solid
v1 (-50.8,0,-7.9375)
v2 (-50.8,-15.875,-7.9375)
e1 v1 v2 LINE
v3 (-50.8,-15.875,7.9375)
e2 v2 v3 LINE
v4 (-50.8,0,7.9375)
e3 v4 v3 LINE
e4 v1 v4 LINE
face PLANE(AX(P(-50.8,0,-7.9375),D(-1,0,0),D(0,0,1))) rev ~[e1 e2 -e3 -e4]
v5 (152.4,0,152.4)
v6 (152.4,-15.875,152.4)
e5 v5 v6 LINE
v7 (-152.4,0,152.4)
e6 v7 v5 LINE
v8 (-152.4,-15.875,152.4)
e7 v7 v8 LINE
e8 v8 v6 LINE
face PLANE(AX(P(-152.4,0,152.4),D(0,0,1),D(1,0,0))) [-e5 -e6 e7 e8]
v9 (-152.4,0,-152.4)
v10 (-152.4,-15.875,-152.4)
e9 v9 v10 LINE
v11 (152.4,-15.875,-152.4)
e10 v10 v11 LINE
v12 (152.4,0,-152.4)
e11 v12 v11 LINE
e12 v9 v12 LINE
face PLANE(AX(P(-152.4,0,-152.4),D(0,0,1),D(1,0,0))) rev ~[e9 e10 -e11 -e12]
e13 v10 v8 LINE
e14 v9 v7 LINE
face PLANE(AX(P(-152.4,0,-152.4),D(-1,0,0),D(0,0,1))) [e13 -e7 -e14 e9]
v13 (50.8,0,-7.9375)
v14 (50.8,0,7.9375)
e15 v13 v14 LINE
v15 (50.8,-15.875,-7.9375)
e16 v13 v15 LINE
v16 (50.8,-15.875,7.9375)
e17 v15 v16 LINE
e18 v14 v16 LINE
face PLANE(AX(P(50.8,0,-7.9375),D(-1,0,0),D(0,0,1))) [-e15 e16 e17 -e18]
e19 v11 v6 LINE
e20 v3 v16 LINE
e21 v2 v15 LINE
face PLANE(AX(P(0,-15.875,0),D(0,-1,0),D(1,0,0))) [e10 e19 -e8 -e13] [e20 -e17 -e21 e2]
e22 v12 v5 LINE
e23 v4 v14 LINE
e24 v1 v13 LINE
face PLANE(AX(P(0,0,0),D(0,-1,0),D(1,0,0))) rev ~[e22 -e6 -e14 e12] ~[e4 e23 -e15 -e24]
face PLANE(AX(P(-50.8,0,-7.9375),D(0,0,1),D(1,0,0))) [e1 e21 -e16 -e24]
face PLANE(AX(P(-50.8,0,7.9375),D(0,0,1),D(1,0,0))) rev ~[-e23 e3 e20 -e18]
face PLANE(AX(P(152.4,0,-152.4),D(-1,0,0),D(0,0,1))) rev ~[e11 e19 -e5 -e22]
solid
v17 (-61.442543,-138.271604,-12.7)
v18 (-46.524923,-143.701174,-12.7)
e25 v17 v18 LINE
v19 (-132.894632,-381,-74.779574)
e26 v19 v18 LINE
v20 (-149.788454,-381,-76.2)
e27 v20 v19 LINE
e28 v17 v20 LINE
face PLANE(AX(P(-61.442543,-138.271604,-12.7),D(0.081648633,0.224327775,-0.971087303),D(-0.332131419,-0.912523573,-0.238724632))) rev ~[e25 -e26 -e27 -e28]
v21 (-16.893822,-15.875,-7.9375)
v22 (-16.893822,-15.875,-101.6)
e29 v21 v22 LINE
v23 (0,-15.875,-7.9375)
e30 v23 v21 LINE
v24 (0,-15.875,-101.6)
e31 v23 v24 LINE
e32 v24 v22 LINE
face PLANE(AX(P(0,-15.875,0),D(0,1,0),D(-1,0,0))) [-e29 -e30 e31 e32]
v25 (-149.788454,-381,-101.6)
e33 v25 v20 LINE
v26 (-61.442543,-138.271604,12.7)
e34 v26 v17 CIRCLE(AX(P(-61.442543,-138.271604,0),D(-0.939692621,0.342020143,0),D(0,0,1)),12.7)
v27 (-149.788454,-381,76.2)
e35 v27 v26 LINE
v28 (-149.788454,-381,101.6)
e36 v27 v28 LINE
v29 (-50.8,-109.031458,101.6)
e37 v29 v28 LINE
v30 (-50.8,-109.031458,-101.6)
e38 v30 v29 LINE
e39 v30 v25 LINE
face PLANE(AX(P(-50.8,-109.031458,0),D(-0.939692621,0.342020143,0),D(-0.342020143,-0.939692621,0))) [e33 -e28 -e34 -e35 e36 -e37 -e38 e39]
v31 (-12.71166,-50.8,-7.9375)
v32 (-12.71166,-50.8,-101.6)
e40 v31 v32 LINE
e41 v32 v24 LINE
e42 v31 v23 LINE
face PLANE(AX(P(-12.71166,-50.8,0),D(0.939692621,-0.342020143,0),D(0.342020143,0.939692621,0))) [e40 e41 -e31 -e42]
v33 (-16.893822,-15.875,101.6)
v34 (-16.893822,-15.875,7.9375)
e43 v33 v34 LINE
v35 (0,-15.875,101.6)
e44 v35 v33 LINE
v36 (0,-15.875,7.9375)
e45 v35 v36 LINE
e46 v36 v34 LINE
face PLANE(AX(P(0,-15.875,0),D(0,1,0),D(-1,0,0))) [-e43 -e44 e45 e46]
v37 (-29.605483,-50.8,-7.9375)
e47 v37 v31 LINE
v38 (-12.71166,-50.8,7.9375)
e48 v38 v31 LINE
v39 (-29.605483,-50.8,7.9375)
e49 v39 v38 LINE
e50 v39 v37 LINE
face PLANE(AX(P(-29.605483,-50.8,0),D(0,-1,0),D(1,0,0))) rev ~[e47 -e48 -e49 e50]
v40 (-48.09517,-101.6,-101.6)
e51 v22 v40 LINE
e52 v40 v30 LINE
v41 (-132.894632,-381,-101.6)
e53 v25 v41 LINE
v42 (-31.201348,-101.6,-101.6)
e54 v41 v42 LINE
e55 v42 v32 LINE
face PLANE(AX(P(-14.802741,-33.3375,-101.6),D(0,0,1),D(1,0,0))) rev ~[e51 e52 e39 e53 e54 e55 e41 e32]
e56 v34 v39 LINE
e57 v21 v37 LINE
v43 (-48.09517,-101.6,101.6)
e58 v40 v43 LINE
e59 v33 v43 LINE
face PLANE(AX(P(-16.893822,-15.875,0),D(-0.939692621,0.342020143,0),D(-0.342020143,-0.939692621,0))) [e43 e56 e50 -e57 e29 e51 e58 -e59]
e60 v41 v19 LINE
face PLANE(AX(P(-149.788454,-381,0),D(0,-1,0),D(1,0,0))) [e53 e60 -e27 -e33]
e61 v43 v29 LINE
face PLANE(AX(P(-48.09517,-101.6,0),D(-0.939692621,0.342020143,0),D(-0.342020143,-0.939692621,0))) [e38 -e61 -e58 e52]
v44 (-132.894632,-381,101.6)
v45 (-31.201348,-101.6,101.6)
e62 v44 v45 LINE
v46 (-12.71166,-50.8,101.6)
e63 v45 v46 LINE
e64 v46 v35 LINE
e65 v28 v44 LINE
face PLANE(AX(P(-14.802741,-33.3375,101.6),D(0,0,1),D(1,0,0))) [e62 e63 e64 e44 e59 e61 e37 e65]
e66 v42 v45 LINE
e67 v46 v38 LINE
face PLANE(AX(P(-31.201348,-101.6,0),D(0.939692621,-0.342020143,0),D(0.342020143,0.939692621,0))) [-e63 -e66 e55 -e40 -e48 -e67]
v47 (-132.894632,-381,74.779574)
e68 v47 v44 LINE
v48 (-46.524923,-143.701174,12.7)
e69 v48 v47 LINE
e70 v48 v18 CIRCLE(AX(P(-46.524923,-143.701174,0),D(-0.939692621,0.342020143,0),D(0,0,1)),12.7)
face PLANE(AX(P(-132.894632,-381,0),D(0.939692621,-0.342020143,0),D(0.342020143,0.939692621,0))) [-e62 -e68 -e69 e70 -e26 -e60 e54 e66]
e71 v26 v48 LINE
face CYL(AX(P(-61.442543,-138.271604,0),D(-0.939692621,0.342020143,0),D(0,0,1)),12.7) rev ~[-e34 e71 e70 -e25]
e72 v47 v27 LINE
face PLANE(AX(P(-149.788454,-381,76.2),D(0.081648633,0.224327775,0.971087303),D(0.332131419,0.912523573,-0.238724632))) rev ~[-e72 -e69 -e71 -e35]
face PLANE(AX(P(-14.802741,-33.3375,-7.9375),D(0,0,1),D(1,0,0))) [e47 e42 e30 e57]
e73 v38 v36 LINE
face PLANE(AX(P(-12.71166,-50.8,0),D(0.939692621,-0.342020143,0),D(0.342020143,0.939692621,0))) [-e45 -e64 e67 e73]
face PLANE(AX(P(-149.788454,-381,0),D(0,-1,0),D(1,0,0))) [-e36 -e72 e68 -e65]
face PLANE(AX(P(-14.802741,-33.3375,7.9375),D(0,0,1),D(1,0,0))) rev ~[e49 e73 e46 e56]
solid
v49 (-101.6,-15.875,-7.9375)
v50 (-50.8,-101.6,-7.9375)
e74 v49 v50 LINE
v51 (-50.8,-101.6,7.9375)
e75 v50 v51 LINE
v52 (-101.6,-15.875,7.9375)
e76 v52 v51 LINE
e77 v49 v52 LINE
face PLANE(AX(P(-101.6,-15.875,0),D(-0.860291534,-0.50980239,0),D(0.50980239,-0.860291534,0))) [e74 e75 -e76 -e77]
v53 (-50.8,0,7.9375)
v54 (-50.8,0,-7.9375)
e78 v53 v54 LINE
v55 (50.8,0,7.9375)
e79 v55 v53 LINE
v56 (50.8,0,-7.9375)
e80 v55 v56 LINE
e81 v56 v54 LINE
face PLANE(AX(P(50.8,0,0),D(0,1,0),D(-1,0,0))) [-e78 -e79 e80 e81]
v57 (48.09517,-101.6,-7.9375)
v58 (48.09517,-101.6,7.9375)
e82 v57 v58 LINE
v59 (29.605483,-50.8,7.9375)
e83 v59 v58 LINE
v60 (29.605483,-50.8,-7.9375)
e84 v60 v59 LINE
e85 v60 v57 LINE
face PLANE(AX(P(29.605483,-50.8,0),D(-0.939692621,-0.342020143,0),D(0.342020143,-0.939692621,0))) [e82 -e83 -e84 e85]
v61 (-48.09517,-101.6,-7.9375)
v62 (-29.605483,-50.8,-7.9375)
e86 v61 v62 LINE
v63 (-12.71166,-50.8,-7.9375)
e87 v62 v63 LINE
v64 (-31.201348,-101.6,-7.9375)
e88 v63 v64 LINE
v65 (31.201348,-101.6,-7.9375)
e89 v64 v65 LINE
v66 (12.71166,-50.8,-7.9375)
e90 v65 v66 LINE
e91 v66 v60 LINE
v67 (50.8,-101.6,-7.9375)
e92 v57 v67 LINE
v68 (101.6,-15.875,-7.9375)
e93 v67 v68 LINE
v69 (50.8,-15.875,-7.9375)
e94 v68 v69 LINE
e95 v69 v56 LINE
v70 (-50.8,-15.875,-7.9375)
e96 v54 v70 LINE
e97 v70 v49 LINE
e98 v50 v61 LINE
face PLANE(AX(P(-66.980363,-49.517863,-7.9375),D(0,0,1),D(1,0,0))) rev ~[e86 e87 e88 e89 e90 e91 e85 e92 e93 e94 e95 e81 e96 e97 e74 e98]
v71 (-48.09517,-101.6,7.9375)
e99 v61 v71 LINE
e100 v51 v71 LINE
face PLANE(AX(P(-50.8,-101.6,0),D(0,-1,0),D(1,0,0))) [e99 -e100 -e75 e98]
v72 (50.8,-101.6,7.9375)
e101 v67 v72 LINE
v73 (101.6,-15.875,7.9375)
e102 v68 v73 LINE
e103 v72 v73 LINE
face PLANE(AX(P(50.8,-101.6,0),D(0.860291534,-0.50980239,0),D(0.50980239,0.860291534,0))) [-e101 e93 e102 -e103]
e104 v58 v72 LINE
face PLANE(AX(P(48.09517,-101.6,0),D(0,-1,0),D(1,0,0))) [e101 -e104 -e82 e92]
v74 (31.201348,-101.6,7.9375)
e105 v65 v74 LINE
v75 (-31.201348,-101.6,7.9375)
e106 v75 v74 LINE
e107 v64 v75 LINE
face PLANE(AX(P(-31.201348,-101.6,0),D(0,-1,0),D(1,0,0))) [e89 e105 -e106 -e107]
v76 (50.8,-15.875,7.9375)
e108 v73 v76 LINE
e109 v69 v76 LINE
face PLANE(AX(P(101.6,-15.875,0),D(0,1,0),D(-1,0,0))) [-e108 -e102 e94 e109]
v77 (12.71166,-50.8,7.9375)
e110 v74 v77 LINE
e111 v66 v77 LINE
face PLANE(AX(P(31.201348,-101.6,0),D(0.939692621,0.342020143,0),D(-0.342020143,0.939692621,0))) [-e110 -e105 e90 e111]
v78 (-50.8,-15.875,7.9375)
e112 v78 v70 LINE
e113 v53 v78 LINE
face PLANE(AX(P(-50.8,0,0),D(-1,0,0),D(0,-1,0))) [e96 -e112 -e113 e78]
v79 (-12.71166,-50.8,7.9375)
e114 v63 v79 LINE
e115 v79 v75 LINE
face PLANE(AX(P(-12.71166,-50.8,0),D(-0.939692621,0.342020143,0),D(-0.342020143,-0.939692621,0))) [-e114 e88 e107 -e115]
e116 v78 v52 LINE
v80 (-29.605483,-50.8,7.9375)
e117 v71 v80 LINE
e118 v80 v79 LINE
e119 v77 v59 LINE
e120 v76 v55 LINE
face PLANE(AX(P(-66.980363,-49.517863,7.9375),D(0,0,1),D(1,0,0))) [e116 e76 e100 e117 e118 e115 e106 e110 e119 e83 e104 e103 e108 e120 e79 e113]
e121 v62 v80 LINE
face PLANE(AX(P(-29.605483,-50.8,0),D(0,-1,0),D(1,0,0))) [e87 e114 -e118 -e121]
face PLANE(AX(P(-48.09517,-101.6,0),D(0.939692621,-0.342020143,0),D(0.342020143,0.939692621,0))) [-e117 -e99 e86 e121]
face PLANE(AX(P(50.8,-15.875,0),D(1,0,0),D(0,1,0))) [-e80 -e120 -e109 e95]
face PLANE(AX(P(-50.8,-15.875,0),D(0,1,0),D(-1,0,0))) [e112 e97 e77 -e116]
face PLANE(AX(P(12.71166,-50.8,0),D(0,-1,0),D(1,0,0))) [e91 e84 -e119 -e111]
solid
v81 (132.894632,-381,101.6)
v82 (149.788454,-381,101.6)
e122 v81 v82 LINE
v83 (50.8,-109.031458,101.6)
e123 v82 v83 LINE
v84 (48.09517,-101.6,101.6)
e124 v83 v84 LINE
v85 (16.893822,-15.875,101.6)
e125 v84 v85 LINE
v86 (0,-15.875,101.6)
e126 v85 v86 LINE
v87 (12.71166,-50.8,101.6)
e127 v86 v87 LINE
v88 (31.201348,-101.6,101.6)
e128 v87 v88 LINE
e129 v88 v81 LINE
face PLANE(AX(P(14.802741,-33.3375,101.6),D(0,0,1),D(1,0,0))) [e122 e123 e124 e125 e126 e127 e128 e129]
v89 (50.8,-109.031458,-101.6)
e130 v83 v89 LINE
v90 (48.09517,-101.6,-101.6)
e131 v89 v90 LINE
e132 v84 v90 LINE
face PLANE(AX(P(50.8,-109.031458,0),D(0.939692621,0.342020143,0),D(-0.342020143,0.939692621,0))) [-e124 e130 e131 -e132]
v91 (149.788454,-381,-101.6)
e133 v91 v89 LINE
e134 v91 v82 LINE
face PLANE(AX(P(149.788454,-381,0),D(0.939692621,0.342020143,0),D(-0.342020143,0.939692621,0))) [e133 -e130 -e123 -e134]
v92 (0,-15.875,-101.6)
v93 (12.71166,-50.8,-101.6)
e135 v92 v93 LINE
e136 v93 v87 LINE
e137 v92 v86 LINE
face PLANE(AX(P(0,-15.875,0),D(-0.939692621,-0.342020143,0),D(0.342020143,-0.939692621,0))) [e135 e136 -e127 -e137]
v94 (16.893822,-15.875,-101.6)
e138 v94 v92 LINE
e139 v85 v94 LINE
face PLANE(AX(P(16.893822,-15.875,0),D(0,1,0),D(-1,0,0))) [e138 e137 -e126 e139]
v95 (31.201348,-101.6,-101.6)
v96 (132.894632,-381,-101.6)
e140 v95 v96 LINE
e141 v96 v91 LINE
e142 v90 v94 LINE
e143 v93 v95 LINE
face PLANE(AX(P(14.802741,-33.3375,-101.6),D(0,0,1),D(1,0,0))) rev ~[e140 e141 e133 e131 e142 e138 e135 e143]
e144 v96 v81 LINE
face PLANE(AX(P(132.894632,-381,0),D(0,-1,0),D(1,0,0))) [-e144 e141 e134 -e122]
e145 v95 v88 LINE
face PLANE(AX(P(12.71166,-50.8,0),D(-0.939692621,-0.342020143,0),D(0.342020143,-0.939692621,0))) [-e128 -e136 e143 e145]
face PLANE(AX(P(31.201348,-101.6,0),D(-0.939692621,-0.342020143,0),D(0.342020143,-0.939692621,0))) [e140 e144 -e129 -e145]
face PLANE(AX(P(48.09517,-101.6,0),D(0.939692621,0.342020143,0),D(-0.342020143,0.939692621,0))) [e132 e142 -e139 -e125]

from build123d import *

# Parameters (mm, degrees)
F0_W          = 304.8
F0_H          = 304.8
F0_W_2        = 101.6
F0_H_2        = 15.875
F1_DEPTH      = 15.875
F3_DEPTH      = 7.9375
F3_DEPTH_BACK = 7.9375
F4_DEPTH      = 101.6
F4_DEPTH_BACK = 101.6
F5_DEPTH      = 7.9375
F5_DEPTH_BACK = 7.9375
F7_DEPTH      = 25.4


with BuildPart() as f1:
    # F0 (on Front) → F1 (new body)
    with BuildSketch(Plane.XZ):
        Rectangle(F0_W, F0_H)
        Rectangle(F0_W_2, F0_H_2, mode=Mode.SUBTRACT)
    extrude(amount=F1_DEPTH)


with BuildPart() as f3:
    # F2 (on Top) → F3 (new body, two sides)
    with BuildSketch(Plane.XY) as f3_sk:
        Polygon((-50.8, -50.8), (-50.8, -15.875), (-101.6, -15.875), (-50.8, -101.6), align=None)
        Polygon((50.8, 0), (-50.8, 0), (-50.8, -15.875), (-50.8, -50.8), (-29.6054825698, -50.8), (-16.8938221381, -15.875), (0, -15.875), (16.8938221381, -15.875), (29.6054825698, -50.8), (50.8, -50.8), (50.8, -15.875), align=None)
        Polygon((101.6, -15.875), (50.8, -15.875), (50.8, -50.8), (50.8, -101.6), align=None)
        Polygon((12.7116604317, -50.8), (-12.7116604317, -50.8), (-31.2013483325, -101.6), (31.2013483325, -101.6), align=None)
        Polygon((-16.8938221381, -15.875), (-29.6054825698, -50.8), (-12.7116604317, -50.8), (0, -15.875), align=None)
        Polygon((-29.6054825698, -50.8), (-50.8, -50.8), (-50.8, -101.6), (-48.0951704705, -101.6), align=None)
        Polygon((12.7116604317, -50.8), (29.6054825698, -50.8), (16.8938221381, -15.875), (0, -15.875), align=None)
        Polygon((50.8, -101.6), (50.8, -50.8), (29.6054825698, -50.8), (48.0951704705, -101.6), align=None)
        Polygon((0, -15.875), (-12.7116604317, -50.8), (12.7116604317, -50.8), align=None)
    extrude(amount=F3_DEPTH)
    extrude(f3_sk.sketch, amount=-F3_DEPTH_BACK)


with BuildPart() as f4:
    # F2 (on Top) → F4 (new body, two sides)
    with BuildSketch(Plane.XY) as f4_sk:
        Polygon((-16.8938221381, -15.875), (-29.6054825698, -50.8), (-12.7116604317, -50.8), (0, -15.875), align=None)
        Polygon((-31.2013483325, -101.6), (-48.0951704705, -101.6), (-50.8, -109.0314580557), (-149.7884539245, -381), (-132.8946317864, -381), align=None)
        Polygon((-12.7116604317, -50.8), (-29.6054825698, -50.8), (-48.0951704705, -101.6), (-31.2013483325, -101.6), align=None)
    extrude(amount=F4_DEPTH)
    extrude(f4_sk.sketch, amount=-F4_DEPTH_BACK)

    # F2 (on Top) → F5 (cut, two sides)
    with BuildSketch(Plane.XY) as f5_sk:
        Polygon((-16.8938221381, -15.875), (-29.6054825698, -50.8), (-12.7116604317, -50.8), (0, -15.875), align=None)
        Polygon((12.7116604317, -50.8), (29.6054825698, -50.8), (16.8938221381, -15.875), (0, -15.875), align=None)
    extrude(amount=F5_DEPTH, mode=Mode.SUBTRACT)
    extrude(f5_sk.sketch, amount=-F5_DEPTH_BACK, mode=Mode.SUBTRACT)

    # F6 (on face) → F7 (cut)
    with BuildSketch(Plane(origin=(-9.8154937031, 3.5725475426, 0), x_dir=(-0.3420201433, -0.9396926208, 0), z_dir=(-0.9396926208, 0.3420201433, 0))):
        with BuildLine():
            ThreePointArc((150.9473935528, 12.7), (159.9276496739, 8.9802561211), (163.6473935528, 0))
            ThreePointArc((163.6473935528, 0), (159.9276496739, -8.9802561211), (150.9473935528, -12.7))
            Line((150.9473935528, -12.7), (409.2535569992, -76.2))
            Line((409.2535569992, -76.2), (409.2535569992, 76.2))
            Line((409.2535569992, 76.2), (150.9473935528, 12.7))
        make_face()
        with BuildLine():
            ThreePointArc((150.9473935528, -12.7), (159.9276496739, -8.9802561211), (163.6473935528, 0))
            ThreePointArc((163.6473935528, 0), (159.9276496739, 8.9802561211), (150.9473935528, 12.7))
            ThreePointArc((150.9473935528, 12.7), (138.2473935528, 0), (150.9473935528, -12.7))
        make_face()
    extrude(amount=-F7_DEPTH, mode=Mode.SUBTRACT)


with BuildPart() as f4b:
    # F2 (on Top) → F4, piece 2 (new body, two sides)
    with BuildSketch(Plane.XY) as f4_2_sk:
        Polygon((12.7116604317, -50.8), (29.6054825698, -50.8), (16.8938221381, -15.875), (0, -15.875), align=None)
        Polygon((48.0951704705, -101.6), (29.6054825698, -50.8), (12.7116604317, -50.8), (31.2013483325, -101.6), align=None)
        Polygon((50.8, -109.0314580557), (48.0951704705, -101.6), (31.2013483325, -101.6), (132.8946317864, -381), (149.7884539245, -381), align=None)
    extrude(amount=F4_DEPTH)
    extrude(f4_2_sk.sketch, amount=-F4_DEPTH_BACK)


solid = Compound([f1.part, f3.part, f4.part, f4b.part])
